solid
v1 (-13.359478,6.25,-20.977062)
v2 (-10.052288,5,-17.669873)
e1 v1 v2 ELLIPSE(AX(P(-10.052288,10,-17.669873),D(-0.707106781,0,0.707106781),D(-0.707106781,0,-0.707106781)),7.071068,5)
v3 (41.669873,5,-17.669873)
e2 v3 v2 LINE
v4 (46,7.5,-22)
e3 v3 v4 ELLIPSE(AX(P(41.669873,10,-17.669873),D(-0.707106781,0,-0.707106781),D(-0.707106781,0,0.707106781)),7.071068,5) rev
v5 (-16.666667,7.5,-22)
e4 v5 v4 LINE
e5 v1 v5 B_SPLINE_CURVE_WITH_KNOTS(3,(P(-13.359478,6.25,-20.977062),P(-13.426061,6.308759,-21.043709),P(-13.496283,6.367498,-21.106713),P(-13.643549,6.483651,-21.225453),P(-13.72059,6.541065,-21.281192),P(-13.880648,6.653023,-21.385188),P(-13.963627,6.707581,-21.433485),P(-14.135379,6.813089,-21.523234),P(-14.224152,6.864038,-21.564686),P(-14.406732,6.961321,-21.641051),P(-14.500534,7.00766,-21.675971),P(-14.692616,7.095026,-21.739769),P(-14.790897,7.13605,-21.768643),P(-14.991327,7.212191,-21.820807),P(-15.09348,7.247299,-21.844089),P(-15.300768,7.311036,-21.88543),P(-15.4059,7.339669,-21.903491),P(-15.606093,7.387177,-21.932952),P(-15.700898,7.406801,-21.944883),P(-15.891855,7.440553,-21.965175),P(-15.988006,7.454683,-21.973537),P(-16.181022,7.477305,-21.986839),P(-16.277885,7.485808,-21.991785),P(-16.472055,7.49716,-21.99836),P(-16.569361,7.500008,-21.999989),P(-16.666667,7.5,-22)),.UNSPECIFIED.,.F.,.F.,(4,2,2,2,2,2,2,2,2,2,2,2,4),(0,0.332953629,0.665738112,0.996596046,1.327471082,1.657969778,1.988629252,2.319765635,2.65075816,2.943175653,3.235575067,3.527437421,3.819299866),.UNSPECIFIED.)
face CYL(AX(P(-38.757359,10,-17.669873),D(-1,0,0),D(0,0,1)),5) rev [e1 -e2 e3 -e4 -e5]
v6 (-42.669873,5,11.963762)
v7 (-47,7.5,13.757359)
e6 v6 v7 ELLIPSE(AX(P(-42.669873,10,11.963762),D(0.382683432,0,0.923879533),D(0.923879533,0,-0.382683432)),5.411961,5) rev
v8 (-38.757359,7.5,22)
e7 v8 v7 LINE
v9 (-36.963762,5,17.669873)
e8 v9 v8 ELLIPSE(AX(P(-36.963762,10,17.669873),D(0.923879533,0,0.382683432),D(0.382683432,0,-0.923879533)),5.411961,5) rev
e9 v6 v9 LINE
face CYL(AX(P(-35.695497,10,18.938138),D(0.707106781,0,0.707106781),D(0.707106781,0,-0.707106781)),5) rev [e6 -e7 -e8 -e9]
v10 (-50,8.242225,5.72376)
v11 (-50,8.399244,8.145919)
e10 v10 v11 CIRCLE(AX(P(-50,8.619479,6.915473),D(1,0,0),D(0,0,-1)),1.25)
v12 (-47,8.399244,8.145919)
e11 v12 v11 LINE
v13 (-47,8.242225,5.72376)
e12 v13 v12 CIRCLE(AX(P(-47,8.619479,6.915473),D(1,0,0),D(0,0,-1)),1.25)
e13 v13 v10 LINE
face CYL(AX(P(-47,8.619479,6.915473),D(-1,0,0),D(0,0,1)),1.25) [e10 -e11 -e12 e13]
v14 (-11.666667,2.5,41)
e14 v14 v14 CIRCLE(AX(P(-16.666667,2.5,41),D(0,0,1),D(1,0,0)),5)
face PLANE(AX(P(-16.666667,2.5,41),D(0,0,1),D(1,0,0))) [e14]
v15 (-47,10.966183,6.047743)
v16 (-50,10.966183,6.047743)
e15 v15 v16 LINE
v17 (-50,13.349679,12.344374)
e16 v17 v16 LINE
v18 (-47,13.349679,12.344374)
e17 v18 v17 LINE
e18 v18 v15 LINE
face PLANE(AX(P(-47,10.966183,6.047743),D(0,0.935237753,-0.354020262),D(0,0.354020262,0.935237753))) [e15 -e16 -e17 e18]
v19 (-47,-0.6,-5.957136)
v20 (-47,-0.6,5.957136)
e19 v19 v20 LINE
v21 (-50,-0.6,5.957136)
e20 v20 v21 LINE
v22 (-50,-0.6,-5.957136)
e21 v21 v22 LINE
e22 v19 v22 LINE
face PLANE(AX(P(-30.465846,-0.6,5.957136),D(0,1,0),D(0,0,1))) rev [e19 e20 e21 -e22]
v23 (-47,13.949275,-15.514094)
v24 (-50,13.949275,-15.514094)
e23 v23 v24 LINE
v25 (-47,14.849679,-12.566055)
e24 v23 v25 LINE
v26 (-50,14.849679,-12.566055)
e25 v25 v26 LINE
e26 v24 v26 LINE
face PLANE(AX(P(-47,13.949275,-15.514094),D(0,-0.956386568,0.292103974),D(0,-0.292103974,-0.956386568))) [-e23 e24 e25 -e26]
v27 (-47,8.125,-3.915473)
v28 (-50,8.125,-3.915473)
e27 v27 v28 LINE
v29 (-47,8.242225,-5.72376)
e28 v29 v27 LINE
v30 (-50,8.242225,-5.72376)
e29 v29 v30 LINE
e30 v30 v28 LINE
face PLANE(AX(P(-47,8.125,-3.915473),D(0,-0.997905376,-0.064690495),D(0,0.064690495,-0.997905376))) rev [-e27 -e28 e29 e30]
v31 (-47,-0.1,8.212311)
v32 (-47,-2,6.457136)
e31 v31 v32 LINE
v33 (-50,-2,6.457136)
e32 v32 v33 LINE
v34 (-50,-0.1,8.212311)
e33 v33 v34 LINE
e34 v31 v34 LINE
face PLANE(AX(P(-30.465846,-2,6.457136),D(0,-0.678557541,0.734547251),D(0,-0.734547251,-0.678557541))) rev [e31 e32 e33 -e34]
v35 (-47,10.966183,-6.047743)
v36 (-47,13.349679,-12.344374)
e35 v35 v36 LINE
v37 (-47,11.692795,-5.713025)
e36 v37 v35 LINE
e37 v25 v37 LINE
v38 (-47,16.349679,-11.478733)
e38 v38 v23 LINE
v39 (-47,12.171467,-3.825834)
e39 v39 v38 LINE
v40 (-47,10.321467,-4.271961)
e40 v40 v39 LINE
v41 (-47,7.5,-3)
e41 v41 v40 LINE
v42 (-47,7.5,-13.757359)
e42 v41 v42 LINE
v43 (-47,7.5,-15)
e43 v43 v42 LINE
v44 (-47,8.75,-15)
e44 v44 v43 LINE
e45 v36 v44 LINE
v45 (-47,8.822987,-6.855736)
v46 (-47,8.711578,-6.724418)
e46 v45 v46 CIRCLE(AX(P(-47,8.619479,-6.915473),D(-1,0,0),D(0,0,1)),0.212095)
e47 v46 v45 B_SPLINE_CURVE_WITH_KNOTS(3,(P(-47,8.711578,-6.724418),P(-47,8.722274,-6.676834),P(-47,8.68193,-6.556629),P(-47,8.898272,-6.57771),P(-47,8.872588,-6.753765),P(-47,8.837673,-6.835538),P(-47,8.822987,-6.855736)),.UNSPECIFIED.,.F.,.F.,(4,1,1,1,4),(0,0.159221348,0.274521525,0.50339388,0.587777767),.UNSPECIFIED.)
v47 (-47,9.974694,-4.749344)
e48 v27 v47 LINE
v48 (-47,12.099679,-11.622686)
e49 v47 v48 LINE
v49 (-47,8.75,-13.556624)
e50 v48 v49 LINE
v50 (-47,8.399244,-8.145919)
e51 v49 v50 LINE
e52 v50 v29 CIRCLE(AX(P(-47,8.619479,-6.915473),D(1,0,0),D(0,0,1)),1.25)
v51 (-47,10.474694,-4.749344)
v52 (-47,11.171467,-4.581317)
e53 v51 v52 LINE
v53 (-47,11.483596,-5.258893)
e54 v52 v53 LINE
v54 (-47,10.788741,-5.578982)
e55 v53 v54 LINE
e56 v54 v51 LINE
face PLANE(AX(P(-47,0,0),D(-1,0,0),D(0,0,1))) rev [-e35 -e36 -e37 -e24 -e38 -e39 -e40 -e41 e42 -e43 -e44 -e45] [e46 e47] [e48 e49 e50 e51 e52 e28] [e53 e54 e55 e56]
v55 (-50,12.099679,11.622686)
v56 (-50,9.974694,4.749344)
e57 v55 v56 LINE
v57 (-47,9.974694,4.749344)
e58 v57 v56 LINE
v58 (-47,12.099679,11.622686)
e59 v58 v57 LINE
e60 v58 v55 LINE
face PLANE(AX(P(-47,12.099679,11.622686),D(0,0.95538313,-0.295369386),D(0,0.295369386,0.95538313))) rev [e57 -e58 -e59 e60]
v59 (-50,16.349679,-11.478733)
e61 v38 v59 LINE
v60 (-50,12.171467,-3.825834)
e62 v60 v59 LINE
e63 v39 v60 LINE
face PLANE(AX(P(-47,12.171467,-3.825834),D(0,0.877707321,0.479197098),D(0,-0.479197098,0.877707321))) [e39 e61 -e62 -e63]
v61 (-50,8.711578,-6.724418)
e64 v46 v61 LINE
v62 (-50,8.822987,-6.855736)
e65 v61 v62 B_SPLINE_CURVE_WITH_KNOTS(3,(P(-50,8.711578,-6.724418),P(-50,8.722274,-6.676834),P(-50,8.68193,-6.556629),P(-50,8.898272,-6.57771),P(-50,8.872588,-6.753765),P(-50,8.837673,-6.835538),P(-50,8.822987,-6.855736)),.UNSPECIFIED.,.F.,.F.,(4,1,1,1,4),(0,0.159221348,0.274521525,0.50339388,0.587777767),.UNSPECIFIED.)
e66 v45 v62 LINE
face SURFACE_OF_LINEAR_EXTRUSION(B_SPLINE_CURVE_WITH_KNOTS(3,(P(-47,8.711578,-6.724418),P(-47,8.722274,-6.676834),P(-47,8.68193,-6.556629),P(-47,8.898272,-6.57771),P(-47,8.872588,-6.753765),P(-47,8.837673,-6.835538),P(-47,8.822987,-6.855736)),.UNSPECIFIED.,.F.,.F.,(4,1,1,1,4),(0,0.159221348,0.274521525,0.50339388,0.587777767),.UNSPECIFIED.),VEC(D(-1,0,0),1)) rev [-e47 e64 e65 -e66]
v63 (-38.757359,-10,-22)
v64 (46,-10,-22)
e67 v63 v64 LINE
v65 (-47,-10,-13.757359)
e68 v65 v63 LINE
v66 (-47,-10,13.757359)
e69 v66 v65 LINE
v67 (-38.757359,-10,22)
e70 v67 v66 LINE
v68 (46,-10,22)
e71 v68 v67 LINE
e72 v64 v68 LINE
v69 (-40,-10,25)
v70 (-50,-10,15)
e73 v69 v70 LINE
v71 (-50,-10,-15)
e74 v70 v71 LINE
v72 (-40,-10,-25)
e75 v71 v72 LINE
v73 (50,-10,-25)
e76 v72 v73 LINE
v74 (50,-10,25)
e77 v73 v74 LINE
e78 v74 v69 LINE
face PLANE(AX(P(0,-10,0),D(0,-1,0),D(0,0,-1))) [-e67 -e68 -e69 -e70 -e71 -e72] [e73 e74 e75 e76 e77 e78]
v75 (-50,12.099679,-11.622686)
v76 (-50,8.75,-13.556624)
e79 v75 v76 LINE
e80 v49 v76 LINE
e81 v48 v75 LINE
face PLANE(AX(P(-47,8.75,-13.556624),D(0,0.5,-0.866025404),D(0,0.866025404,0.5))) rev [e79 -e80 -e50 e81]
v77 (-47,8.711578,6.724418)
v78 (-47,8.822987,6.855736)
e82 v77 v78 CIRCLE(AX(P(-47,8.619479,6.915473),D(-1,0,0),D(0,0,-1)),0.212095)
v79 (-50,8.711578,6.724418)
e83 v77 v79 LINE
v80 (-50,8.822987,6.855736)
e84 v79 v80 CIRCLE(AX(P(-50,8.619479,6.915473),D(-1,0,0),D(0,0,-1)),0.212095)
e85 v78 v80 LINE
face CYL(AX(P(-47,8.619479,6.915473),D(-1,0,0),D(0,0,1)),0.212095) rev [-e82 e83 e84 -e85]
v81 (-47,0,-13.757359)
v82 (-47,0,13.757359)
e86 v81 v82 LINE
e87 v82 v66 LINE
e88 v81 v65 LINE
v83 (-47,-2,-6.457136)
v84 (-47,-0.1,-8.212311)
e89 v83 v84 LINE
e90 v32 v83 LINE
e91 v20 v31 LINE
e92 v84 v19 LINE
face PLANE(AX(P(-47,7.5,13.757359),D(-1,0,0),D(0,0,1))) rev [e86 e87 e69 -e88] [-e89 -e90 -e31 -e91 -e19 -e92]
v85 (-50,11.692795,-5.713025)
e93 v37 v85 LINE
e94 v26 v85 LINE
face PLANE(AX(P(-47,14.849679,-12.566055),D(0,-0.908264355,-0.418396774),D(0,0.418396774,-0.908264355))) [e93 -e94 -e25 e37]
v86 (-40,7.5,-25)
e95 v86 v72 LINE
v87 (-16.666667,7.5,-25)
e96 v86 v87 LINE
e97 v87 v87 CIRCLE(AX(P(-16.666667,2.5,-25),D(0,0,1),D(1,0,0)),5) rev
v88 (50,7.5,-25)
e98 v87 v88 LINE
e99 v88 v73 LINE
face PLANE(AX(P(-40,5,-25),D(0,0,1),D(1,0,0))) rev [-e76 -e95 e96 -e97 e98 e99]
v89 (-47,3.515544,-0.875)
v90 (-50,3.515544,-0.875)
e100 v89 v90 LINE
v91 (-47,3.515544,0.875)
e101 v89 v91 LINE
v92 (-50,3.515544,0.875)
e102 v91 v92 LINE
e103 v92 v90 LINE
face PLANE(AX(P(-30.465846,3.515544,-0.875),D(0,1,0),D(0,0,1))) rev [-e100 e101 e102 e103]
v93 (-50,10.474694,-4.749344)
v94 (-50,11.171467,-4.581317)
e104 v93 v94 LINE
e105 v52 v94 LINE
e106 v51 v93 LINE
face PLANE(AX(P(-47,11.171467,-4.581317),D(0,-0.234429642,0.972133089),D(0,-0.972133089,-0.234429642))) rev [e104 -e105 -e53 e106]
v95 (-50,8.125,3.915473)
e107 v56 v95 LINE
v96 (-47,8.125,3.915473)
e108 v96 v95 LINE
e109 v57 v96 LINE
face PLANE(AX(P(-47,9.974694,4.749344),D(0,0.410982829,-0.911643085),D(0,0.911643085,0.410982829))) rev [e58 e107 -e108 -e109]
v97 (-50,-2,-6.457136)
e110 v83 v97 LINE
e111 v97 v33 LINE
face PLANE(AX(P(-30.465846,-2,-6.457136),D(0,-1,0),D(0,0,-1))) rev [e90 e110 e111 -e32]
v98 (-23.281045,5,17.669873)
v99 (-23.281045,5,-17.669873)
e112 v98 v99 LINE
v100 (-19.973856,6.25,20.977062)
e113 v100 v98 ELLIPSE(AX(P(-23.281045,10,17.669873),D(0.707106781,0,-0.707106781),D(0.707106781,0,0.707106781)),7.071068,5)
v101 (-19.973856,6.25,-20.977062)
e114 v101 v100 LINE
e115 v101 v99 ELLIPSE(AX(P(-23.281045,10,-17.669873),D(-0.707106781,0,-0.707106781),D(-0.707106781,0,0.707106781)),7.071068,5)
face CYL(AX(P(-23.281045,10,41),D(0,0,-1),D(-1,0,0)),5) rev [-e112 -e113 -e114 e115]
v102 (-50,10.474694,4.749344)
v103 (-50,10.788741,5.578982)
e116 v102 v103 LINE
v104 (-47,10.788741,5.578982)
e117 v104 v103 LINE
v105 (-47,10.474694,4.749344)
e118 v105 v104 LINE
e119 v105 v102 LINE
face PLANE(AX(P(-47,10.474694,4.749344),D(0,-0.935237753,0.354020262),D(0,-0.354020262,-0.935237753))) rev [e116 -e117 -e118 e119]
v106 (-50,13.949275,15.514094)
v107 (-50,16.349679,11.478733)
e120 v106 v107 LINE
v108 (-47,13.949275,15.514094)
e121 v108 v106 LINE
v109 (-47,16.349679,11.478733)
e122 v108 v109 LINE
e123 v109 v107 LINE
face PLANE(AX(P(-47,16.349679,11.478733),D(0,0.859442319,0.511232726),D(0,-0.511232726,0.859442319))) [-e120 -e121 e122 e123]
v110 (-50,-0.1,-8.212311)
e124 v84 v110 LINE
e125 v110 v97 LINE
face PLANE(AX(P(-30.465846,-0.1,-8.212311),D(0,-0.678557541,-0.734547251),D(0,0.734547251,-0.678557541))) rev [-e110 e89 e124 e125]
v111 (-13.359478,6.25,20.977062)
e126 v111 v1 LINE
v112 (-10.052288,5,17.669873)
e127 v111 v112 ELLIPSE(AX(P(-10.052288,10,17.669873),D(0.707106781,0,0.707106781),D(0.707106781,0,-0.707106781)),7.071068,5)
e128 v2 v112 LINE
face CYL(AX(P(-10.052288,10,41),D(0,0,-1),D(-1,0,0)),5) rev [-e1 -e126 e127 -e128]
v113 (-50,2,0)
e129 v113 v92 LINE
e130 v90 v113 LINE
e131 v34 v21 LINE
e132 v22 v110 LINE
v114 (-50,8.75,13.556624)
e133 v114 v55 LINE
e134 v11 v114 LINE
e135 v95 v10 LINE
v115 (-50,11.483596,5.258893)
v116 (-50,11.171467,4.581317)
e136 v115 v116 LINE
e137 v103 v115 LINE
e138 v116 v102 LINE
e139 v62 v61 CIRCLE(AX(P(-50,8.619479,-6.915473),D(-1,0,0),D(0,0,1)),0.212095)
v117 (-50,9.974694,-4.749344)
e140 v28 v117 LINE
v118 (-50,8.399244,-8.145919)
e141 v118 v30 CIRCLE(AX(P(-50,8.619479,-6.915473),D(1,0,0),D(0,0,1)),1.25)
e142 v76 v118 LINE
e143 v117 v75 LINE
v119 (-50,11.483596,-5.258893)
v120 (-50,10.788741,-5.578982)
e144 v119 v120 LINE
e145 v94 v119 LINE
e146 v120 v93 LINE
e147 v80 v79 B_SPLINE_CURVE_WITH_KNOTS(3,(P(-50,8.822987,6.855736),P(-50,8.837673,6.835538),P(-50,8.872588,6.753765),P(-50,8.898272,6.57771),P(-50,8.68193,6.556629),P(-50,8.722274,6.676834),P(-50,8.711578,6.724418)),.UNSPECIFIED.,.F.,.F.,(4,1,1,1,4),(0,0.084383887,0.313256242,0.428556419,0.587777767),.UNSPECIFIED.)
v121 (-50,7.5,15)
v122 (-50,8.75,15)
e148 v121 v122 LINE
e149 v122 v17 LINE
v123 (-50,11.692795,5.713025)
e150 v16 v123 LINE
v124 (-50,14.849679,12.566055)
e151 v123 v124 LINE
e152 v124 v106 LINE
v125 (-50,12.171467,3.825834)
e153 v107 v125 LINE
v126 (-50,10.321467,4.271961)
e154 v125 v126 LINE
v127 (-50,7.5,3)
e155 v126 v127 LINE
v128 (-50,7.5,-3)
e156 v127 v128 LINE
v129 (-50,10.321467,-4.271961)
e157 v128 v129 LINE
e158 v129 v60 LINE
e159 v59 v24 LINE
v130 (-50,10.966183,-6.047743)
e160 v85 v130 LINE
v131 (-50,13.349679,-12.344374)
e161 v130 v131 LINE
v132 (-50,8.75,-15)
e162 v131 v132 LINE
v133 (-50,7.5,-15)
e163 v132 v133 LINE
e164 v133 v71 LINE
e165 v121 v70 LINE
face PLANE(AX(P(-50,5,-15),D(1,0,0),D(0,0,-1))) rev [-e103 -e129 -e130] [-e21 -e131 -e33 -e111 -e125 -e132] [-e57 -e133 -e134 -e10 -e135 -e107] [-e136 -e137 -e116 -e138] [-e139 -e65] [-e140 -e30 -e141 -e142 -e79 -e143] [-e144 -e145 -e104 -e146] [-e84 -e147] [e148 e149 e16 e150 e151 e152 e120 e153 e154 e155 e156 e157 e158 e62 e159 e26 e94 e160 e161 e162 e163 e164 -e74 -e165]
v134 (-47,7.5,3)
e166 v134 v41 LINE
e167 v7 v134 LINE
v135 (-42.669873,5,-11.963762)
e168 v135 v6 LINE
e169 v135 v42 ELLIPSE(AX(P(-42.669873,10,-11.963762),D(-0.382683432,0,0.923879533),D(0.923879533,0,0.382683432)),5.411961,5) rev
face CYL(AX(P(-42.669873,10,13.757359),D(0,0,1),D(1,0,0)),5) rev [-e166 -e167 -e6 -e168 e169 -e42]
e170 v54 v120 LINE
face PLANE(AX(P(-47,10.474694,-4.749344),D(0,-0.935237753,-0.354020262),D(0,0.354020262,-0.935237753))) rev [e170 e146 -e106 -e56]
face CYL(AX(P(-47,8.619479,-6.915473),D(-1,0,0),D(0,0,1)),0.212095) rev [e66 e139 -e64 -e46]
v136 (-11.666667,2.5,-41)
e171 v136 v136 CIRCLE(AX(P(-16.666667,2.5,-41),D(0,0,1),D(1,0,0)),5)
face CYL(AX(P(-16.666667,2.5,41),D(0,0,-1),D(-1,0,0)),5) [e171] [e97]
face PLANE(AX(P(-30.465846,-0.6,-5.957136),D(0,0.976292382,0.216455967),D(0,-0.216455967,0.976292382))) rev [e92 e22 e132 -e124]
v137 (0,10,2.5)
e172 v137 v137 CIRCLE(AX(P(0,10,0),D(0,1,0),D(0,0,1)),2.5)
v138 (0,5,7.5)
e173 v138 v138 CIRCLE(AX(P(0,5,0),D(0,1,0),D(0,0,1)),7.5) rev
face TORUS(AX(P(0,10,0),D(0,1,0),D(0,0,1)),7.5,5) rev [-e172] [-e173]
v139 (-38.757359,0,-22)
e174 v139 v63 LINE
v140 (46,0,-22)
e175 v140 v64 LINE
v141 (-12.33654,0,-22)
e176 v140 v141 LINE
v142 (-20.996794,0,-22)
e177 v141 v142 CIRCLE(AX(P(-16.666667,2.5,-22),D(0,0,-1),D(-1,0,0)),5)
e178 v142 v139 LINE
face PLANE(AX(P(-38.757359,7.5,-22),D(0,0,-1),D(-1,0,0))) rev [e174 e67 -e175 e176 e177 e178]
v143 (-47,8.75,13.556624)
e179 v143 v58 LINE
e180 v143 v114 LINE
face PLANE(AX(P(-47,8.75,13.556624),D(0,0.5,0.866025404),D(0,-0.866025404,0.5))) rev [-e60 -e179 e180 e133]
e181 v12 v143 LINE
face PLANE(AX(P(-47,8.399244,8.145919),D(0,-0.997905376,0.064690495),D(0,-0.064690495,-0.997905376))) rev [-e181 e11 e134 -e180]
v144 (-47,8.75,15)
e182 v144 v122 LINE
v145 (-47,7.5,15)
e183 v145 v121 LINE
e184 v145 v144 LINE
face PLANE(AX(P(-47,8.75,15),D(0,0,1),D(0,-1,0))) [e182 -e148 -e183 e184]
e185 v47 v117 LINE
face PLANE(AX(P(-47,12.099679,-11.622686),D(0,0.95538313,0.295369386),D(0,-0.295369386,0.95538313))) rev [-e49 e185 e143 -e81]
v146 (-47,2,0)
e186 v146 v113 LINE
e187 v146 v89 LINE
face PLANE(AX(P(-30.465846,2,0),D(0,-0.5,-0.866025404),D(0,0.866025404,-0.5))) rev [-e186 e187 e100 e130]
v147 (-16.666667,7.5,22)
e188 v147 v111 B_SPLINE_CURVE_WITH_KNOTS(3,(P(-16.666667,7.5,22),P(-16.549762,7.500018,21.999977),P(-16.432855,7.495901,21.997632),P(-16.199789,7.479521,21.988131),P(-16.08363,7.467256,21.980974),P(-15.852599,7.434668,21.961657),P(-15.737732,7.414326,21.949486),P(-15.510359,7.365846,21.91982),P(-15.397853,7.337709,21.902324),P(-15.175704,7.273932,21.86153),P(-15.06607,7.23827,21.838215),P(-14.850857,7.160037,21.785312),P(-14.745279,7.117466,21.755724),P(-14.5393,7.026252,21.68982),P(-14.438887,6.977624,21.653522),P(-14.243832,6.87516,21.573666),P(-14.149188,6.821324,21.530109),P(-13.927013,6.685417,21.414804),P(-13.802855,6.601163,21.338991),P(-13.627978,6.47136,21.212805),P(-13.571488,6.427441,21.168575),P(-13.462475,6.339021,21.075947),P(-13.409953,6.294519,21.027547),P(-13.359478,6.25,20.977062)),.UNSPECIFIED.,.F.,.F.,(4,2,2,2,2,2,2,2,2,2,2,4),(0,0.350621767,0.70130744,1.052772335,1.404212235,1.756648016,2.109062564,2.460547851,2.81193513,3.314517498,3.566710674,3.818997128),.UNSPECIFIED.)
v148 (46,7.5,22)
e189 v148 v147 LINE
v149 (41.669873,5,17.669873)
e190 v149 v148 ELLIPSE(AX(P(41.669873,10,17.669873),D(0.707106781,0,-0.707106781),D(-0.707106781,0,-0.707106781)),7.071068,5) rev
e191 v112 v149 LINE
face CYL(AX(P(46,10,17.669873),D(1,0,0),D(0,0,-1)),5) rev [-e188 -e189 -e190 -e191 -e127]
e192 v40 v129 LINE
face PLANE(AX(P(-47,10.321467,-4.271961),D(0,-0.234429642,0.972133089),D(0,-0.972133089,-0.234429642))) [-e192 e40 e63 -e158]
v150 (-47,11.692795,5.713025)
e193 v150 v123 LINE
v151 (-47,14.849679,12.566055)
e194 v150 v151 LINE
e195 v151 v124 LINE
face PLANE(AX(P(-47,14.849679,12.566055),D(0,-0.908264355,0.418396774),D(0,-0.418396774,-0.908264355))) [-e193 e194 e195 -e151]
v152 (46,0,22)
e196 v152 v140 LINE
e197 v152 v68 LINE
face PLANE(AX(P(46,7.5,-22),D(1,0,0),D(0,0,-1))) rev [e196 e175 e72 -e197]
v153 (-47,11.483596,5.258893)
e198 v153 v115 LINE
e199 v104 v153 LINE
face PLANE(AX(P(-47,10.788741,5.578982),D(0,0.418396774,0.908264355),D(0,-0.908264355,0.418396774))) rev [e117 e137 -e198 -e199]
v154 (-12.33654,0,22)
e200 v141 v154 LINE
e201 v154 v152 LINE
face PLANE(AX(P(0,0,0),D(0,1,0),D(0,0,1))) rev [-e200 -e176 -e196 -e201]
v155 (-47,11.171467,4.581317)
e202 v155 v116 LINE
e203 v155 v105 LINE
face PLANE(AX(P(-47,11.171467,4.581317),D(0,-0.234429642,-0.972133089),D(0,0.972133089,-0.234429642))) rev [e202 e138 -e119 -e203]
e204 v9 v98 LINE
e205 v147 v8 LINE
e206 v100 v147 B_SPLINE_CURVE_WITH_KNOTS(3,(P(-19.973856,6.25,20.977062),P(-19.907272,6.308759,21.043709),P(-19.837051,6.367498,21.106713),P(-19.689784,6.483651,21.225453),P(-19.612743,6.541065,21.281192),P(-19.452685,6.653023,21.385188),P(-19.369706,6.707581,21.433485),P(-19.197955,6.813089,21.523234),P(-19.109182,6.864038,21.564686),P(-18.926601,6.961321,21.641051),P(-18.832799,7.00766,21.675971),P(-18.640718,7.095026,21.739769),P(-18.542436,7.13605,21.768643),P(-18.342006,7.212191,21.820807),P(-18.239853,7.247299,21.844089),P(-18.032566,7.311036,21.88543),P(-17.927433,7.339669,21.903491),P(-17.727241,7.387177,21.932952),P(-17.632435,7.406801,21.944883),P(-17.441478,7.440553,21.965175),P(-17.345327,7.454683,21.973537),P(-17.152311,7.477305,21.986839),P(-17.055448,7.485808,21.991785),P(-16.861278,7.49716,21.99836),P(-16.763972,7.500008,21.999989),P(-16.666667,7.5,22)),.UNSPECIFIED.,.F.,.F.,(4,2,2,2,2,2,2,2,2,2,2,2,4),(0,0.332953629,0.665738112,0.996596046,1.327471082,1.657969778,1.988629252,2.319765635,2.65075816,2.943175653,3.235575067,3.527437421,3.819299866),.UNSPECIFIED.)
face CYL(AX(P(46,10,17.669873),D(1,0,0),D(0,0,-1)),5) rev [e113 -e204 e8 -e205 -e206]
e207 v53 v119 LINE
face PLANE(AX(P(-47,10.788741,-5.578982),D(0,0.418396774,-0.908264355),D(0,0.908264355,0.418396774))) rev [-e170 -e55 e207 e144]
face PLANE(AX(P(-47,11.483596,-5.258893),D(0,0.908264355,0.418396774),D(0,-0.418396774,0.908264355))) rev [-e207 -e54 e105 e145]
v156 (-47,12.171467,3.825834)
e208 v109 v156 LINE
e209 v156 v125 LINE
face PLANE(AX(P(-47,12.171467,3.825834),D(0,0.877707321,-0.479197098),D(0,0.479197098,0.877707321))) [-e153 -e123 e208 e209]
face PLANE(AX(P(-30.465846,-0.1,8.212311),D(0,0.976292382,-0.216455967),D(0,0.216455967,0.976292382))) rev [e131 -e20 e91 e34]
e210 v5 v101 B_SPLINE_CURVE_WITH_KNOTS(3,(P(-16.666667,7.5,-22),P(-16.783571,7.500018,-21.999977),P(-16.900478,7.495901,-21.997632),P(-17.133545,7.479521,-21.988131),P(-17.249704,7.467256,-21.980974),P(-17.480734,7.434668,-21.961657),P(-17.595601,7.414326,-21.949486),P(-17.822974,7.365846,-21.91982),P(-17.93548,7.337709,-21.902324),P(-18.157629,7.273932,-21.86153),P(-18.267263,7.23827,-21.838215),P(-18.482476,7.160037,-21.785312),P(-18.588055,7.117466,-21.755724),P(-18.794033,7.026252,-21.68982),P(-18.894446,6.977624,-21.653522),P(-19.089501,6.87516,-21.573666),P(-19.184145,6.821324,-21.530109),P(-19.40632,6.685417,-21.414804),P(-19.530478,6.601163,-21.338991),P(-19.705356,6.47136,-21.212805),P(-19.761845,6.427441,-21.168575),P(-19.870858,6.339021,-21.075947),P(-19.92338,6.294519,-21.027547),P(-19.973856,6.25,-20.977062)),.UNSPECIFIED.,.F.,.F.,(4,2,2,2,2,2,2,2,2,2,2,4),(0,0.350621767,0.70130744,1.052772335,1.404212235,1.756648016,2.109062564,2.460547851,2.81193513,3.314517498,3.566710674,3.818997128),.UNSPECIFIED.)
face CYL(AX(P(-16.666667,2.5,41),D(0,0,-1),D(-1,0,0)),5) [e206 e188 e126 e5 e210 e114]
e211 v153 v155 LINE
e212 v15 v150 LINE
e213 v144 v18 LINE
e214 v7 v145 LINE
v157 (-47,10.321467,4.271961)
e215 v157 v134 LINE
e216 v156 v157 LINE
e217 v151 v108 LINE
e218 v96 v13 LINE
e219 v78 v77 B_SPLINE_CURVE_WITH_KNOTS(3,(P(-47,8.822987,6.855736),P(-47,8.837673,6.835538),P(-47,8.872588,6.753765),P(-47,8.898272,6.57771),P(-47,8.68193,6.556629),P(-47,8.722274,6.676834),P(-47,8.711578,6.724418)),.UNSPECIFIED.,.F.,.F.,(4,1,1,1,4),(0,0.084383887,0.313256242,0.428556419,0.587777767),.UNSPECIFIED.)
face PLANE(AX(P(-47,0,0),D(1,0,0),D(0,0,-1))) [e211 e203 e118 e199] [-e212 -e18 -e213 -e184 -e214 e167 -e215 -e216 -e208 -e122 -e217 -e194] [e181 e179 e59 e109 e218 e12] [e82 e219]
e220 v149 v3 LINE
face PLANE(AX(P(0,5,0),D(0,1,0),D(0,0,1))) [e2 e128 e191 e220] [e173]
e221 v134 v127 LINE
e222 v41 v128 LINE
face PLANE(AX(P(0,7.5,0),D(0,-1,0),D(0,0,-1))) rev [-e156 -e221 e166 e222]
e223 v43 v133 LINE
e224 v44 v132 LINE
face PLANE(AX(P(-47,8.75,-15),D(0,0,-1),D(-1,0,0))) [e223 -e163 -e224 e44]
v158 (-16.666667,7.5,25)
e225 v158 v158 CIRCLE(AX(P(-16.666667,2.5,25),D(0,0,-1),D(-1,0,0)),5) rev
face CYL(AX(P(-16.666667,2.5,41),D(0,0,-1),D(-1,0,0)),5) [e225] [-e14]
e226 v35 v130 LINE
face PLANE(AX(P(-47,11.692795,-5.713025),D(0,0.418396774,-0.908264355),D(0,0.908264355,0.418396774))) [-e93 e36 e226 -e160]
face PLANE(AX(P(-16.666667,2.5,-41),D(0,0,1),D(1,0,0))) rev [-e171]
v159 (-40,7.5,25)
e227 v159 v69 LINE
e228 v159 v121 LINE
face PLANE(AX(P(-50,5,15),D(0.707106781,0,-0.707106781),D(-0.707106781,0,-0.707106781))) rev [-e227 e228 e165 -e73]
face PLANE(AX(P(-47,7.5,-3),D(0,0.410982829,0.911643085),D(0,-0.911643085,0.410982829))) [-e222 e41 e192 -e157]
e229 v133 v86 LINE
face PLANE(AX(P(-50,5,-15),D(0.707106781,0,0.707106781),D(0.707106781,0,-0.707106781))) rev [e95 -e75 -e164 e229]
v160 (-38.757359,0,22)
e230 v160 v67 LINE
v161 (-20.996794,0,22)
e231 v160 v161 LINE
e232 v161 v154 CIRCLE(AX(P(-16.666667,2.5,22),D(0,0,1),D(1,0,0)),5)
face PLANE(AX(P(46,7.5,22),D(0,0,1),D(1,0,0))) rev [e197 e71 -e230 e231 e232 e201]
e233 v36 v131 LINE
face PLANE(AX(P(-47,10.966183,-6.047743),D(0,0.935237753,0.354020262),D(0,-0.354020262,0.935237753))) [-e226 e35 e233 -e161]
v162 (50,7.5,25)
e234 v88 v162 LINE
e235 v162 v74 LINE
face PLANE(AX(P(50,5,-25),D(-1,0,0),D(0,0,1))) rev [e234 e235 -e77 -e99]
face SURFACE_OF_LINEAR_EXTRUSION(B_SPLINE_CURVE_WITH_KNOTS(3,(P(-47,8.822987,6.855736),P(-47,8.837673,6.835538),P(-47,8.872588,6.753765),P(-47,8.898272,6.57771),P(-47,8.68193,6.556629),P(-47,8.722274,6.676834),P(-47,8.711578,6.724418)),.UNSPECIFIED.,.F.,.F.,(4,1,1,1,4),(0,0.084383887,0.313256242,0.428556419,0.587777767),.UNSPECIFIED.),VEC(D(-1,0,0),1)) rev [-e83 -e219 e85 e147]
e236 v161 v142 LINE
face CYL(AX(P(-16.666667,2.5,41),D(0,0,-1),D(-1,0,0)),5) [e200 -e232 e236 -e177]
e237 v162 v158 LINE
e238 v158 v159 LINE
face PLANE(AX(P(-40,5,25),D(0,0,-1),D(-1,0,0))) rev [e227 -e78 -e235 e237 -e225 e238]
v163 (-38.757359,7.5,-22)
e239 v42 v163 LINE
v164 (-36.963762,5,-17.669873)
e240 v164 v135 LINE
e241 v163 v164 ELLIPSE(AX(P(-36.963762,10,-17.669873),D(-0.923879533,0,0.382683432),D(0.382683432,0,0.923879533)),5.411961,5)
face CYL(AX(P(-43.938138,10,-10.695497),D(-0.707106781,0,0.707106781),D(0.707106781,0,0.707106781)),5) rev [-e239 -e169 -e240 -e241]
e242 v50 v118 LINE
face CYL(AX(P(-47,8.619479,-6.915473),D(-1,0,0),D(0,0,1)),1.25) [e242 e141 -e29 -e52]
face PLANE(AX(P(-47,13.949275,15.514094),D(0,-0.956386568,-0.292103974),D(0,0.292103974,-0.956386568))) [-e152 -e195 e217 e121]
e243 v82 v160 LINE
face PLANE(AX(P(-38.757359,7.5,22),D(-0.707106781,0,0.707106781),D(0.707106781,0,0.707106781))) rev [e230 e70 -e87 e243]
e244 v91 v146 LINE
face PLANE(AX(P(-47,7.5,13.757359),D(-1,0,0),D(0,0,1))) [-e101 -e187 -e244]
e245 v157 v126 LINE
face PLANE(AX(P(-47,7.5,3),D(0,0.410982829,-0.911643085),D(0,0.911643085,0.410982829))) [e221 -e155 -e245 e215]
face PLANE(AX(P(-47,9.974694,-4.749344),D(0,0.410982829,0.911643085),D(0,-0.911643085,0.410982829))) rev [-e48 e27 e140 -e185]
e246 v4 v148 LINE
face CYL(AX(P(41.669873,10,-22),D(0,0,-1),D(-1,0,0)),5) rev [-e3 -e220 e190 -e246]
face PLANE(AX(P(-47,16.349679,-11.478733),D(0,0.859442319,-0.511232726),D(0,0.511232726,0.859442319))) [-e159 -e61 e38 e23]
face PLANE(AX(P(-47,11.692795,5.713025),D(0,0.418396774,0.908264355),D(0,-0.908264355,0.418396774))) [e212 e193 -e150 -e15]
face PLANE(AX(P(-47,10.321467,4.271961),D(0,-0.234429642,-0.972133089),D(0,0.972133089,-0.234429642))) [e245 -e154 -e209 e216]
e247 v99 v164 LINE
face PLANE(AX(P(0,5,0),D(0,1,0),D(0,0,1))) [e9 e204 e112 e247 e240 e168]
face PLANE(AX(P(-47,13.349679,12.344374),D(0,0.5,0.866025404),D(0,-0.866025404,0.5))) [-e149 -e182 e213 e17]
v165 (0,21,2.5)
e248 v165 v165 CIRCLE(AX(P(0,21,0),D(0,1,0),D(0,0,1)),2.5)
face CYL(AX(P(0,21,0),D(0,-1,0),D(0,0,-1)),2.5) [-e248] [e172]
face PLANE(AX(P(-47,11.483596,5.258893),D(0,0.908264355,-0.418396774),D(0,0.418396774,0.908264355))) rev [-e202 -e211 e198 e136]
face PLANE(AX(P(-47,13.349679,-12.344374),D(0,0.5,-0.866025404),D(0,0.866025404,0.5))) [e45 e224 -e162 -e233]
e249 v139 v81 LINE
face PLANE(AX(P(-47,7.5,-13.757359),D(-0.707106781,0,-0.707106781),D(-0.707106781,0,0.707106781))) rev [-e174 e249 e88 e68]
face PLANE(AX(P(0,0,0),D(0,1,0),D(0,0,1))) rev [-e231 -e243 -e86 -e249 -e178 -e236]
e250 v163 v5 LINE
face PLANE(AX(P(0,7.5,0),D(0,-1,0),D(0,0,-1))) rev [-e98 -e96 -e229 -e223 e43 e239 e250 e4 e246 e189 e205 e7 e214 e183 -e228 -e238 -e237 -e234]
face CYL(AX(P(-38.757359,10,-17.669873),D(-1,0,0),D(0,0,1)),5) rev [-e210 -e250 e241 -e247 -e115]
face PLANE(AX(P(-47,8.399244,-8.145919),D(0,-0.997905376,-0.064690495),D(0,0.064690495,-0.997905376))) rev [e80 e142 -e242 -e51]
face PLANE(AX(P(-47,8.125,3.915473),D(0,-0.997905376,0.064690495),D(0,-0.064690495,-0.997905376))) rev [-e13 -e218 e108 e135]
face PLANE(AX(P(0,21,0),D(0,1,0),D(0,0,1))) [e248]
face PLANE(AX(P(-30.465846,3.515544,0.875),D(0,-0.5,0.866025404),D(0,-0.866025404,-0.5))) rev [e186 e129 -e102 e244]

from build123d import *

# Parameters (mm, degrees)
SALIENTE_EXTRUIR1_DEPTH       = 5
CROQUIS2_R                    = 5
SALIENTE_EXTRUIR2_DEPTH       = 41
CROQUIS3_R                    = 2.5
SALIENTE_EXTRUIR3_DEPTH       = 16
SALIENTE_EXTRUIR10_DEPTH      = 10
SALIENTE_EXTRUIR10_DEPTH_BACK = 7.5
REDONDEO3_R                   = 5
SALIENTE_EXTRUIR11_DEPTH      = 3
CORTAR_EXTRUIR1_DEPTH         = 3


with BuildPart() as part:
    # Croquis1 → Saliente-Extruir1 (new body)
    with BuildSketch(Plane(origin=(0, 0, 0), x_dir=(1, 0, 0), z_dir=(0, 1, 0))):
        Polygon((-50, 15), (-40, 25), (50, 25), (50, -25), (-40, -25), (-50, -15), align=None)
    extrude(amount=SALIENTE_EXTRUIR1_DEPTH)

    # Croquis2 → Saliente-Extruir2 (add, symmetric)
    with BuildSketch(Plane.XY):
        with Locations((-16.666666667, 2.5)):
            Circle(CROQUIS2_R)
    extrude(amount=SALIENTE_EXTRUIR2_DEPTH, both=True)

    # Croquis3 → Saliente-Extruir3 (add)
    with BuildSketch(Plane(origin=(0, 5, 0), x_dir=(1, 0, 0), z_dir=(0, 1, 0))):
        with Locations(Location((0, 0, 0), (0, 0, 270))):
            Circle(CROQUIS3_R)
    extrude(amount=SALIENTE_EXTRUIR3_DEPTH)

    # Croquis24 → Saliente-Extruir10 (add, two sides: drawn at the far end of the back side and taken through both)
    with BuildSketch(Plane.XZ.offset(-SALIENTE_EXTRUIR10_DEPTH_BACK)):
        Polygon((50, 25), (-40, 25), (-50, 15), (-50, -15), (-40, -25), (50, -25), align=None)
        Polygon((46, 22), (-38.757359313, 22), (-47, 13.757359313), (-47, -13.757359313), (-38.757359313, -22), (46, -22), align=None, mode=Mode.SUBTRACT)
    extrude(amount=SALIENTE_EXTRUIR10_DEPTH + SALIENTE_EXTRUIR10_DEPTH_BACK)

    # Redondeo3
    # the kernel refuses this fillet: 5 mm, written as the material it adds along each edge
    with BuildSketch(Plane(origin=(46, 5, -22), x_dir=(0, 0, 1), z_dir=(-1, 0, 0)), Plane(origin=(-23.161857195, 5, 22), x_dir=(0, 0, -1), z_dir=(1, 0, 0))) as redondeo3_piece_1:
        with BuildLine():
            CenterArc((4.330127019, 5), REDONDEO3_R, 210, 60)
            Line((0, 2.5), (0, 0))
            Line((0, 0), (4.330127019, 0))
        make_face()
    extrude(amount=69.161857195)
    with BuildSketch(Plane(origin=(46, 5, 22), x_dir=(-1, 0, 0), z_dir=(0, 0, -1))) as redondeo3_piece_2:
        with BuildLine():
            CenterArc((4.330127019, 5), REDONDEO3_R, 210, 60)
            Line((0, 2.5), (0, 0))
            Line((0, 0), (4.330127019, 0))
        make_face()
    extrude(amount=44)
    with BuildSketch(Plane(origin=(-20.996793686, 5, -22), x_dir=(-1, 0, 0), z_dir=(0, 0, 1))) as redondeo3_piece_3:
        with BuildLine():
            CenterArc((2.284251259, -5), REDONDEO3_R, 90, 41.409622109)
            ThreePointArc((-1.02293788, -1.25), (-0.460660063, -0.66657946), (0, 0))
            Line((0, 0), (2.284251259, 0))
        make_face()
    extrude(amount=44)
    with BuildSketch(Plane(origin=(-12.336539648, 5, -22), x_dir=(-0.6333158920043388, 0.7738933911946454, 0), z_dir=(0, 0, 1))) as redondeo3_piece_4:
        with BuildLine():
            CenterArc((2.422814332, -4.934346413), REDONDEO3_R, 99.295188945, 41.409622109)
            Line((-1.446652623, -1.767766953), (0, 0))
            ThreePointArc((0, 0), (0.807604777, -0.065653587), (1.615209555, 0))
        make_face()
    extrude(amount=44)
    with BuildSketch(Plane(origin=(-49.58267686, 5, 22), x_dir=(0, 0, -1), z_dir=(1, 0, 0))) as redondeo3_piece_5_section:
        with BuildLine():
            CenterArc((4.330127019, 5), REDONDEO3_R, 210, 60)
            Line((0, 2.5), (0, 0))
            Line((0, 0), (4.330127019, 0))
        make_face()
    redondeo3_piece_5 = extrude(amount=39.411200722, mode=Mode.PRIVATE)
    redondeo3_piece_5 = split(redondeo3_piece_5, bisect_by=Plane(origin=(-35.229781416, 5.661212727, 25.527577897), z_dir=(0.7071067811865477, 0, -0.7071067811865475)), keep=Keep.TOP, mode=Mode.PRIVATE)
    add(redondeo3_piece_5)
    with BuildSketch(Plane(origin=(-54.654655446, 5, 6.102703867), x_dir=(0, 1, 0), z_dir=(0.7071067811865475, 0, 0.7071067811865477))) as redondeo3_piece_6_section:
        with BuildLine():
            CenterArc((5, -4.330127019), REDONDEO3_R, 120, 60)
            Line((0, -4.330127019), (0, 0))
            Line((0, 0), (2.5, 0))
        make_face()
    redondeo3_piece_6 = extrude(amount=33.307489344, mode=Mode.PRIVATE)
    redondeo3_piece_6 = split(redondeo3_piece_6, bisect_by=Plane(origin=(-47, 5.661212727, 16.588119965), z_dir=(1, 0, 0)), keep=Keep.TOP, mode=Mode.PRIVATE)
    redondeo3_piece_6 = split(redondeo3_piece_6, bisect_by=Plane(origin=(-41.588119965, 5.661212727, 22), z_dir=(0, 0, -1)), keep=Keep.TOP, mode=Mode.PRIVATE)
    add(redondeo3_piece_6)
    with BuildSketch(Plane(origin=(-47, 5, -24.58267686), x_dir=(1, 0, 0), z_dir=(0, 0, 1))) as redondeo3_piece_7_section:
        with BuildLine():
            CenterArc((4.330127019, 5), REDONDEO3_R, 210, 60)
            Line((0, 2.5), (0, 0))
            Line((0, 0), (4.330127019, 0))
        make_face()
    redondeo3_piece_7 = extrude(amount=49.16535372, mode=Mode.PRIVATE)
    redondeo3_piece_7 = split(redondeo3_piece_7, bisect_by=Plane(origin=(-52.966116147, 5.661212727, 7.791243166), z_dir=(0.7071067811865477, 0, -0.7071067811865475)), keep=Keep.TOP, mode=Mode.PRIVATE)
    redondeo3_piece_7 = split(redondeo3_piece_7, bisect_by=Plane(origin=(-52.966116147, 5.661212727, -7.791243166), z_dir=(0.7071067811865477, 0, 0.7071067811865474)), keep=Keep.TOP, mode=Mode.PRIVATE)
    add(redondeo3_piece_7)
    with BuildSketch(Plane(origin=(-31.102703867, 5, -29.654655446), x_dir=(0.7071067811865478, 0, 0.7071067811865474), z_dir=(-0.7071067811865474, 0, 0.7071067811865477))) as redondeo3_piece_8_section:
        with BuildLine():
            CenterArc((4.330127019, 5), REDONDEO3_R, 210, 60)
            Line((0, 2.5), (0, 0))
            Line((0, 0), (4.330127019, 0))
        make_face()
    redondeo3_piece_8 = extrude(amount=33.307489344, mode=Mode.PRIVATE)
    redondeo3_piece_8 = split(redondeo3_piece_8, bisect_by=Plane(origin=(-47, 5.661212727, -16.588119965), z_dir=(1, 0, 0)), keep=Keep.TOP, mode=Mode.PRIVATE)
    redondeo3_piece_8 = split(redondeo3_piece_8, bisect_by=Plane(origin=(-41.588119965, 5.661212727, -22), z_dir=(0, 0, 1)), keep=Keep.TOP, mode=Mode.PRIVATE)
    add(redondeo3_piece_8)
    with BuildSketch(Plane(origin=(-10.171476138, 5, -22), x_dir=(0, 0, 1), z_dir=(-1, 0, 0))) as redondeo3_piece_9_section:
        with BuildLine():
            CenterArc((4.330127019, 5), REDONDEO3_R, 210, 60)
            Line((0, 2.5), (0, 0))
            Line((0, 0), (4.330127019, 0))
        make_face()
    redondeo3_piece_9 = extrude(amount=39.411200722, mode=Mode.PRIVATE)
    redondeo3_piece_9 = split(redondeo3_piece_9, bisect_by=Plane(origin=(-26.735758427, 5.066113157, -34.021600886), z_dir=(0.7071067811865477, 0, 0.7071067811865474)), keep=Keep.TOP, mode=Mode.PRIVATE)
    add(redondeo3_piece_9)
    with BuildSketch(Plane(origin=(0, 5, 0), x_dir=(0, 0, 1), z_dir=(-1, 0, 0))) as redondeo3_piece_10:
        with BuildLine():
            CenterArc((2.5 + REDONDEO3_R, REDONDEO3_R), REDONDEO3_R, 180, 90)
            Line((2.5, REDONDEO3_R), (2.5, 0))
            Line((2.5, 0), (2.5 + REDONDEO3_R, 0))
        make_face()
    revolve(axis=Axis((0, 5, 0), (0, 1, 0)))

    # Croquis25 → Saliente-Extruir11 (add)
    # profile 1 of 2: a face of its own
    with BuildSketch(Plane.ZY.offset(50)):
        Polygon((-3, 7.5), (-4.271961203, 10.321467355), (-3.825834184, 12.171467355), (-11.478733088, 16.349678992), (-15.514093965, 13.949275268), (-12.566054552, 14.849678992), (-5.713025242, 11.692794832), (-6.047742661, 10.966183347), (-12.344374095, 13.349678992), (-15, 8.75), (-15, 7.5), align=None)
        Polygon((-5.258893064, 11.483596445), (-4.581316792, 11.171467355), (-4.749343557, 10.474693788), (-5.578981907, 10.788740976), align=None, mode=Mode.SUBTRACT)
        with BuildLine():
            Line((-13.556624327, 8.75), (-11.622686259, 12.099678992))
            Line((-11.622686259, 12.099678992), (-4.749343557, 9.974693788))
            Line((-4.749343557, 9.974693788), (-3.915472936, 8.125))
            Line((-3.915472936, 8.125), (-5.723760223, 8.242224542))
            ThreePointArc((-5.723760223, 8.242224542), (-6.834609816, 9.866860567), (-8.145918644, 8.399244067))
            Line((-8.145918644, 8.399244067), (-13.556624327, 8.75))
        make_face(mode=Mode.SUBTRACT)
        with BuildLine():
            ThreePointArc((-6.85573604, 8.822987446), (-7.052684855, 8.457747166), (-6.724418166, 8.711578367))
            add(Edge.make_bspline(
                [(-6.724418166, 8.711578367), (-6.676833807, 8.722274165), (-6.55662927, 8.681929546), (-6.577709986, 8.898272332), (-6.753765056, 8.872588077), (-6.835537659, 8.837673257), (-6.85573604, 8.822987446)],
                knots=[0, 0, 0, 0, 0.159221348, 0.274521525, 0.50339388, 0.587777767, 0.587777767, 0.587777767, 0.587777767], degree=3))
        make_face(mode=Mode.SUBTRACT)
    # profile 2 of 2: a face of its own
    with BuildSketch(Plane.ZY.offset(50)):
        Polygon((15, 7.5), (3, 7.5), (4.271961203, 10.321467355), (3.825834184, 12.171467355), (11.478733088, 16.349678992), (15.514093965, 13.949275268), (12.566054552, 14.849678992), (5.713025242, 11.692794832), (6.047742661, 10.966183347), (12.344374095, 13.349678992), (15, 8.75), align=None)
        Polygon((5.258893064, 11.483596445), (4.581316792, 11.171467355), (4.749343557, 10.474693788), (5.578981907, 10.788740976), align=None, mode=Mode.SUBTRACT)
        with BuildLine():
            Line((3.915472936, 8.125), (5.723760223, 8.242224542))
            ThreePointArc((5.723760223, 8.242224542), (6.834609816, 9.866860567), (8.145918644, 8.399244067))
            Line((8.145918644, 8.399244067), (13.556624327, 8.75))
            Line((13.556624327, 8.75), (11.622686259, 12.099678992))
            Line((11.622686259, 12.099678992), (4.749343557, 9.974693788))
            Line((4.749343557, 9.974693788), (3.915472936, 8.125))
        make_face(mode=Mode.SUBTRACT)
        with BuildLine():
            ThreePointArc((6.85573604, 8.822987446), (7.052684855, 8.457747166), (6.724418166, 8.711578367))
            add(Edge.make_bspline(
                [(6.724418166, 8.711578367), (6.676833807, 8.722274165), (6.55662927, 8.681929546), (6.577709986, 8.898272332), (6.753765056, 8.872588077), (6.835537659, 8.837673257), (6.85573604, 8.822987446)],
                knots=[0, 0, 0, 0, 0.159221348, 0.274521525, 0.50339388, 0.587777767, 0.587777767, 0.587777767, 0.587777767], degree=3))
        make_face(mode=Mode.SUBTRACT)
    extrude(amount=-SALIENTE_EXTRUIR11_DEPTH)

    # Croquis26 → Cortar-Extruir1 (cut)
    with BuildSketch(Plane.ZY.offset(50)):
        Polygon((-6.45713592, -2), (6.45713592, -2), (8.212311407, -0.1), (5.95713592, -0.6), (-5.95713592, -0.6), (-8.212311407, -0.1), align=None)
        Polygon((-0.875, 3.515544457), (0.875, 3.515544457), (0, 2), align=None)
    extrude(amount=-CORTAR_EXTRUIR1_DEPTH, mode=Mode.SUBTRACT)


solid = part.part
